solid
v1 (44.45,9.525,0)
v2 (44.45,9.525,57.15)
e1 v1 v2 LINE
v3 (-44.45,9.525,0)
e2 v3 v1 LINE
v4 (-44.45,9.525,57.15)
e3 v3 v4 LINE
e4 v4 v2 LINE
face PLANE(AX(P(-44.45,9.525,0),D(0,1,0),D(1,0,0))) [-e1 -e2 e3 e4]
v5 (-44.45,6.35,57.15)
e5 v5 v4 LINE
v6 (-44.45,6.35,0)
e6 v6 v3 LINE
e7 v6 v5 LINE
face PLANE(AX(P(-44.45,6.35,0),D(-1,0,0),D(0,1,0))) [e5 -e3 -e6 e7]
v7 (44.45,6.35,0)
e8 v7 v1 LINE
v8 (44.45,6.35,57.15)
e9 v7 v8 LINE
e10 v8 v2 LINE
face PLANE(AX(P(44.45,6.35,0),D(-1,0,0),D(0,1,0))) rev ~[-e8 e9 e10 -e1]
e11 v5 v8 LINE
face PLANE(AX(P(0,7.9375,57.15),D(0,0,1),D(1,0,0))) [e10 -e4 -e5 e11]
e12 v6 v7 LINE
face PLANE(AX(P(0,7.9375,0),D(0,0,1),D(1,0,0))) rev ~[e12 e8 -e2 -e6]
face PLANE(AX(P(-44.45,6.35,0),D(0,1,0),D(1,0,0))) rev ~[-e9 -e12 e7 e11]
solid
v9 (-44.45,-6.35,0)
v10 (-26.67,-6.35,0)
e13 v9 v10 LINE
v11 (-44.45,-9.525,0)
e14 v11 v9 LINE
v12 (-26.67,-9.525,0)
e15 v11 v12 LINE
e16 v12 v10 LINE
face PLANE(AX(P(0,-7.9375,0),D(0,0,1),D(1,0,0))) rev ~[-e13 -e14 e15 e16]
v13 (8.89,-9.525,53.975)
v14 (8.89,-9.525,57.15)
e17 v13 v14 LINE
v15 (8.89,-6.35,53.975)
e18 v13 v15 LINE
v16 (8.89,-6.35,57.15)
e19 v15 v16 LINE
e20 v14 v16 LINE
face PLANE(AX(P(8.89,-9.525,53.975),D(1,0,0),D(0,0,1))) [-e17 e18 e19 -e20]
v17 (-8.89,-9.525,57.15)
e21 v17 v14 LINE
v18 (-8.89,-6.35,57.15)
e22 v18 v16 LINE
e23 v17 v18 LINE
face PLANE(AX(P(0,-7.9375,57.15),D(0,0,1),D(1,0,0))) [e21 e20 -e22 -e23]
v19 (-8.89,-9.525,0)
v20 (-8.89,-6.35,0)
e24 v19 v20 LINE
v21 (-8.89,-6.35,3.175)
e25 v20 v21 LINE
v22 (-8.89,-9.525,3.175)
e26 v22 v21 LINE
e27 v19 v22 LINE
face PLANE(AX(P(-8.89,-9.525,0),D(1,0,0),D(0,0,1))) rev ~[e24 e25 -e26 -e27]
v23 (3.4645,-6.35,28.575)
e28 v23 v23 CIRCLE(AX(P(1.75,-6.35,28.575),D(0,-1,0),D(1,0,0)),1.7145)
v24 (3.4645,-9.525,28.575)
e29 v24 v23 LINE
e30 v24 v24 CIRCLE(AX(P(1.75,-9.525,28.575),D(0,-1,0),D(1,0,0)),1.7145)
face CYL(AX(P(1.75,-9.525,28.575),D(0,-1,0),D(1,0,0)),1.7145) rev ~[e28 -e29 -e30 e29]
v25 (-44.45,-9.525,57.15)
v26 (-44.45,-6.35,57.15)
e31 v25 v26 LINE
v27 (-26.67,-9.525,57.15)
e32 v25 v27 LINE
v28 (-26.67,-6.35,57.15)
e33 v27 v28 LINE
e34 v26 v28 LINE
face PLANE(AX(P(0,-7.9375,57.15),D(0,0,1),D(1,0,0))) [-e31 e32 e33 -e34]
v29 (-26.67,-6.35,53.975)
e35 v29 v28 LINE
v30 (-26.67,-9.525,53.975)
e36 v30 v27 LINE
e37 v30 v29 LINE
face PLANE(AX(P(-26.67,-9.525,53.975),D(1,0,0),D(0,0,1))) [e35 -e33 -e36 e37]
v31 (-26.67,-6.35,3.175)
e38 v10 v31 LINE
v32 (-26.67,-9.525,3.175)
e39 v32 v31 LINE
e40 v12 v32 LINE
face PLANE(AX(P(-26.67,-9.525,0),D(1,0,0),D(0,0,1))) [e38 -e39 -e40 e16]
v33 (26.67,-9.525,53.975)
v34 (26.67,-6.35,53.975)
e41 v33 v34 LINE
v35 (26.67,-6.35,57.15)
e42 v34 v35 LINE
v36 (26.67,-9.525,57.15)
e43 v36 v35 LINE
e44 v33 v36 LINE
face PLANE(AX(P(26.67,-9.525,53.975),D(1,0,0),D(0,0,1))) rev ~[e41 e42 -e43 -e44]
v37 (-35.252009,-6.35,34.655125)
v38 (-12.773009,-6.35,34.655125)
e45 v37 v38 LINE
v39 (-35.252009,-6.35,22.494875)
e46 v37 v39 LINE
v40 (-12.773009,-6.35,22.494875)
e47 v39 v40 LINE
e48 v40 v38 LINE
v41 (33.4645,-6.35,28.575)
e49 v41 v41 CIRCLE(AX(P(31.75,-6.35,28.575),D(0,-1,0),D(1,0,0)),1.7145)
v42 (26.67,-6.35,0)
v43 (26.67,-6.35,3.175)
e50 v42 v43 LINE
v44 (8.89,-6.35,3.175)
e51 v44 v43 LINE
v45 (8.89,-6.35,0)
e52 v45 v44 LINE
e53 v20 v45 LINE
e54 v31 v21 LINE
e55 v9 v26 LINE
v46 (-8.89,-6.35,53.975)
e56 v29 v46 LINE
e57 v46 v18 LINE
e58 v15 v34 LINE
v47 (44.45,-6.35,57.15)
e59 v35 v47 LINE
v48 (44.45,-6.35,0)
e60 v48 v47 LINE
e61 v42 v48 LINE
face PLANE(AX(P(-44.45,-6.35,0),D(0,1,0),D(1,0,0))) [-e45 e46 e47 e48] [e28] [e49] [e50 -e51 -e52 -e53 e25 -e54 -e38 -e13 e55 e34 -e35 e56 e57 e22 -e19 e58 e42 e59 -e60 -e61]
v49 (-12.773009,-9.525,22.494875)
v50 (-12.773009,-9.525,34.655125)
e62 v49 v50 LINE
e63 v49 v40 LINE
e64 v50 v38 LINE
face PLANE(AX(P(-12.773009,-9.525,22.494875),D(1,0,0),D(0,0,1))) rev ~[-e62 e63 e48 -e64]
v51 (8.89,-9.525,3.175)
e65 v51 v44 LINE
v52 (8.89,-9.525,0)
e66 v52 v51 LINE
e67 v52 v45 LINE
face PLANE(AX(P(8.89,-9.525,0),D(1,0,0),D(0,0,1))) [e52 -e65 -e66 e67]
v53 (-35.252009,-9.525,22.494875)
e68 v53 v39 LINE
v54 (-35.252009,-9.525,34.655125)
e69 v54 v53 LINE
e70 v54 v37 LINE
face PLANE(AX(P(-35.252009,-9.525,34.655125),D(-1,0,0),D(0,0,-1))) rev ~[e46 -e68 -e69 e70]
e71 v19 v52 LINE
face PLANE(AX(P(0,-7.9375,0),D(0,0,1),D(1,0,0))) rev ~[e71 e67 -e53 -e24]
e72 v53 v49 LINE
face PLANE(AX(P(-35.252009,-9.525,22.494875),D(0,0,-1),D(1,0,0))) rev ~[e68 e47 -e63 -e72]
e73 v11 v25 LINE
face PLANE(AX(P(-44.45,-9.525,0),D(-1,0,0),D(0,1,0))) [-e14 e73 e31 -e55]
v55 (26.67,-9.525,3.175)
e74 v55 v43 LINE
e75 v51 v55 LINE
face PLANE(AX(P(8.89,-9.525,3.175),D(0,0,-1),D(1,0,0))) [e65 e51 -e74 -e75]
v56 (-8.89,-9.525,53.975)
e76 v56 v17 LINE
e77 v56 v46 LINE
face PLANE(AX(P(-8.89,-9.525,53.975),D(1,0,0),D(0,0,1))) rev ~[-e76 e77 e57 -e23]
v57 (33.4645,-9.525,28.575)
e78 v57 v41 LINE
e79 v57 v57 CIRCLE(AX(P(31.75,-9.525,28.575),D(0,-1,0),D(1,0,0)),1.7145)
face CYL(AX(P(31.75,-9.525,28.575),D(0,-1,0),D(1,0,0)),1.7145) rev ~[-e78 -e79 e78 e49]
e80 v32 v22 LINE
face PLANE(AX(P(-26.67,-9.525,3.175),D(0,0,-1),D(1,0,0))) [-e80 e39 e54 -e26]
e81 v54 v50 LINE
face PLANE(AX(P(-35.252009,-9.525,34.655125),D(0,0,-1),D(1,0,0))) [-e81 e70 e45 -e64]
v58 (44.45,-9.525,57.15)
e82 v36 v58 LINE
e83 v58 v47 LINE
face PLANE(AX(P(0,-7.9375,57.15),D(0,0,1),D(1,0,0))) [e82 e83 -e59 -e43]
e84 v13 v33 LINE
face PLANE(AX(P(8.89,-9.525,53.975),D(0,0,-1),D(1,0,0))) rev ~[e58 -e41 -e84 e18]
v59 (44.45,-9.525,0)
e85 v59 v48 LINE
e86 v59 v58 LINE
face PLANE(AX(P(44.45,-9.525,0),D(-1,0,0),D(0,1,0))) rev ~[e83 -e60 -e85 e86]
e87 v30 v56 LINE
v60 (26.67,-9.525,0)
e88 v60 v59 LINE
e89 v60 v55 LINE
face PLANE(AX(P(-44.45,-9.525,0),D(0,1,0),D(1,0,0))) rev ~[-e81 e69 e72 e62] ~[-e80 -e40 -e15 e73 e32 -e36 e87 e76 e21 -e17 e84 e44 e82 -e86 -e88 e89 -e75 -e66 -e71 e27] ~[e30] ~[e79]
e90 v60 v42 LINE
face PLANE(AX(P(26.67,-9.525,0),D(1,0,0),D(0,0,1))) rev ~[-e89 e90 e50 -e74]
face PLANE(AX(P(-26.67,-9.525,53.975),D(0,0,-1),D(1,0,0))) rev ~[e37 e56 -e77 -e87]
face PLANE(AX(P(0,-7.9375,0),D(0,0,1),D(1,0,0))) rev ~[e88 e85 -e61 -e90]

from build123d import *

# Parameters (mm, degrees)
F0_W       = 88.9
F0_H       = 3.175
F1_DEPTH   = 57.15
F2_W       = 17.78
F2_H       = 3.175
F2_W_2     = 22.479
F2_H_2     = 6.080125
F1_FACE1_W = 88.9
F1_FACE1_H = 57.15
F3_DEPTH   = 19.051


with BuildPart() as f1:
    # F0 (on Top) → F1 (new body)
    with BuildSketch(Plane.XY):
        with Locations((0, 7.9375)):
            Rectangle(F0_W, F0_H)
    extrude(amount=F1_DEPTH)


with BuildPart() as f1b:
    # F0 (on Top) → F1, piece 2 (new body)
    with BuildSketch(Plane.XY):
        with Locations((0, -7.9375)):
            Rectangle(F0_W, F0_H)
    extrude(amount=F1_DEPTH)

    # F2 (on face) + F1_face1 (on face) → F3 (cut, through all)
    with BuildSketch(Plane.XZ.offset(9.525)):
        with Locations((-17.78, 55.5625)):
            Rectangle(F2_W, F2_H)
        with Locations((17.78, 55.5625)):
            Rectangle(F2_W, F2_H)
        with Locations((-17.78, 1.5875)):
            Rectangle(F2_W, F2_H)
        with Locations((17.78, 1.5875)):
            Rectangle(F2_W, F2_H)
        with Locations((-24.0125088, 31.6150625)):
            Rectangle(F2_W_2, F2_H_2)
        with Locations((-24.0125088, 25.5349375)):
            Rectangle(F2_W_2, F2_H_2)
        with BuildLine():
            Line((3.4645, 28.575), (0.0355, 28.575))
            ThreePointArc((0.0355, 28.575), (1.75, 26.8605), (3.4645, 28.575))
        make_face()
        with BuildLine():
            ThreePointArc((3.4645, 28.575), (1.75, 30.2895), (0.0355, 28.575))
            Line((0.0355, 28.575), (3.4645, 28.575))
        make_face()
        with BuildLine():
            Line((33.4645, 28.575), (30.0355, 28.575))
            ThreePointArc((30.0355, 28.575), (31.75, 26.8605), (33.4645, 28.575))
        make_face()
        with BuildLine():
            ThreePointArc((33.4645, 28.575), (31.75, 30.2895), (30.0355, 28.575))
            Line((30.0355, 28.575), (33.4645, 28.575))
        make_face()
    with BuildSketch(Plane(origin=(0, -6.35, 28.575), x_dir=(-1, 0, 0), z_dir=(0, 1, 0))):
        Rectangle(F1_FACE1_W, F1_FACE1_H)
    extrude(amount=-F3_DEPTH, dir=(0, -1, 0), mode=Mode.SUBTRACT)


solid = Compound([f1.part, f1b.part])
